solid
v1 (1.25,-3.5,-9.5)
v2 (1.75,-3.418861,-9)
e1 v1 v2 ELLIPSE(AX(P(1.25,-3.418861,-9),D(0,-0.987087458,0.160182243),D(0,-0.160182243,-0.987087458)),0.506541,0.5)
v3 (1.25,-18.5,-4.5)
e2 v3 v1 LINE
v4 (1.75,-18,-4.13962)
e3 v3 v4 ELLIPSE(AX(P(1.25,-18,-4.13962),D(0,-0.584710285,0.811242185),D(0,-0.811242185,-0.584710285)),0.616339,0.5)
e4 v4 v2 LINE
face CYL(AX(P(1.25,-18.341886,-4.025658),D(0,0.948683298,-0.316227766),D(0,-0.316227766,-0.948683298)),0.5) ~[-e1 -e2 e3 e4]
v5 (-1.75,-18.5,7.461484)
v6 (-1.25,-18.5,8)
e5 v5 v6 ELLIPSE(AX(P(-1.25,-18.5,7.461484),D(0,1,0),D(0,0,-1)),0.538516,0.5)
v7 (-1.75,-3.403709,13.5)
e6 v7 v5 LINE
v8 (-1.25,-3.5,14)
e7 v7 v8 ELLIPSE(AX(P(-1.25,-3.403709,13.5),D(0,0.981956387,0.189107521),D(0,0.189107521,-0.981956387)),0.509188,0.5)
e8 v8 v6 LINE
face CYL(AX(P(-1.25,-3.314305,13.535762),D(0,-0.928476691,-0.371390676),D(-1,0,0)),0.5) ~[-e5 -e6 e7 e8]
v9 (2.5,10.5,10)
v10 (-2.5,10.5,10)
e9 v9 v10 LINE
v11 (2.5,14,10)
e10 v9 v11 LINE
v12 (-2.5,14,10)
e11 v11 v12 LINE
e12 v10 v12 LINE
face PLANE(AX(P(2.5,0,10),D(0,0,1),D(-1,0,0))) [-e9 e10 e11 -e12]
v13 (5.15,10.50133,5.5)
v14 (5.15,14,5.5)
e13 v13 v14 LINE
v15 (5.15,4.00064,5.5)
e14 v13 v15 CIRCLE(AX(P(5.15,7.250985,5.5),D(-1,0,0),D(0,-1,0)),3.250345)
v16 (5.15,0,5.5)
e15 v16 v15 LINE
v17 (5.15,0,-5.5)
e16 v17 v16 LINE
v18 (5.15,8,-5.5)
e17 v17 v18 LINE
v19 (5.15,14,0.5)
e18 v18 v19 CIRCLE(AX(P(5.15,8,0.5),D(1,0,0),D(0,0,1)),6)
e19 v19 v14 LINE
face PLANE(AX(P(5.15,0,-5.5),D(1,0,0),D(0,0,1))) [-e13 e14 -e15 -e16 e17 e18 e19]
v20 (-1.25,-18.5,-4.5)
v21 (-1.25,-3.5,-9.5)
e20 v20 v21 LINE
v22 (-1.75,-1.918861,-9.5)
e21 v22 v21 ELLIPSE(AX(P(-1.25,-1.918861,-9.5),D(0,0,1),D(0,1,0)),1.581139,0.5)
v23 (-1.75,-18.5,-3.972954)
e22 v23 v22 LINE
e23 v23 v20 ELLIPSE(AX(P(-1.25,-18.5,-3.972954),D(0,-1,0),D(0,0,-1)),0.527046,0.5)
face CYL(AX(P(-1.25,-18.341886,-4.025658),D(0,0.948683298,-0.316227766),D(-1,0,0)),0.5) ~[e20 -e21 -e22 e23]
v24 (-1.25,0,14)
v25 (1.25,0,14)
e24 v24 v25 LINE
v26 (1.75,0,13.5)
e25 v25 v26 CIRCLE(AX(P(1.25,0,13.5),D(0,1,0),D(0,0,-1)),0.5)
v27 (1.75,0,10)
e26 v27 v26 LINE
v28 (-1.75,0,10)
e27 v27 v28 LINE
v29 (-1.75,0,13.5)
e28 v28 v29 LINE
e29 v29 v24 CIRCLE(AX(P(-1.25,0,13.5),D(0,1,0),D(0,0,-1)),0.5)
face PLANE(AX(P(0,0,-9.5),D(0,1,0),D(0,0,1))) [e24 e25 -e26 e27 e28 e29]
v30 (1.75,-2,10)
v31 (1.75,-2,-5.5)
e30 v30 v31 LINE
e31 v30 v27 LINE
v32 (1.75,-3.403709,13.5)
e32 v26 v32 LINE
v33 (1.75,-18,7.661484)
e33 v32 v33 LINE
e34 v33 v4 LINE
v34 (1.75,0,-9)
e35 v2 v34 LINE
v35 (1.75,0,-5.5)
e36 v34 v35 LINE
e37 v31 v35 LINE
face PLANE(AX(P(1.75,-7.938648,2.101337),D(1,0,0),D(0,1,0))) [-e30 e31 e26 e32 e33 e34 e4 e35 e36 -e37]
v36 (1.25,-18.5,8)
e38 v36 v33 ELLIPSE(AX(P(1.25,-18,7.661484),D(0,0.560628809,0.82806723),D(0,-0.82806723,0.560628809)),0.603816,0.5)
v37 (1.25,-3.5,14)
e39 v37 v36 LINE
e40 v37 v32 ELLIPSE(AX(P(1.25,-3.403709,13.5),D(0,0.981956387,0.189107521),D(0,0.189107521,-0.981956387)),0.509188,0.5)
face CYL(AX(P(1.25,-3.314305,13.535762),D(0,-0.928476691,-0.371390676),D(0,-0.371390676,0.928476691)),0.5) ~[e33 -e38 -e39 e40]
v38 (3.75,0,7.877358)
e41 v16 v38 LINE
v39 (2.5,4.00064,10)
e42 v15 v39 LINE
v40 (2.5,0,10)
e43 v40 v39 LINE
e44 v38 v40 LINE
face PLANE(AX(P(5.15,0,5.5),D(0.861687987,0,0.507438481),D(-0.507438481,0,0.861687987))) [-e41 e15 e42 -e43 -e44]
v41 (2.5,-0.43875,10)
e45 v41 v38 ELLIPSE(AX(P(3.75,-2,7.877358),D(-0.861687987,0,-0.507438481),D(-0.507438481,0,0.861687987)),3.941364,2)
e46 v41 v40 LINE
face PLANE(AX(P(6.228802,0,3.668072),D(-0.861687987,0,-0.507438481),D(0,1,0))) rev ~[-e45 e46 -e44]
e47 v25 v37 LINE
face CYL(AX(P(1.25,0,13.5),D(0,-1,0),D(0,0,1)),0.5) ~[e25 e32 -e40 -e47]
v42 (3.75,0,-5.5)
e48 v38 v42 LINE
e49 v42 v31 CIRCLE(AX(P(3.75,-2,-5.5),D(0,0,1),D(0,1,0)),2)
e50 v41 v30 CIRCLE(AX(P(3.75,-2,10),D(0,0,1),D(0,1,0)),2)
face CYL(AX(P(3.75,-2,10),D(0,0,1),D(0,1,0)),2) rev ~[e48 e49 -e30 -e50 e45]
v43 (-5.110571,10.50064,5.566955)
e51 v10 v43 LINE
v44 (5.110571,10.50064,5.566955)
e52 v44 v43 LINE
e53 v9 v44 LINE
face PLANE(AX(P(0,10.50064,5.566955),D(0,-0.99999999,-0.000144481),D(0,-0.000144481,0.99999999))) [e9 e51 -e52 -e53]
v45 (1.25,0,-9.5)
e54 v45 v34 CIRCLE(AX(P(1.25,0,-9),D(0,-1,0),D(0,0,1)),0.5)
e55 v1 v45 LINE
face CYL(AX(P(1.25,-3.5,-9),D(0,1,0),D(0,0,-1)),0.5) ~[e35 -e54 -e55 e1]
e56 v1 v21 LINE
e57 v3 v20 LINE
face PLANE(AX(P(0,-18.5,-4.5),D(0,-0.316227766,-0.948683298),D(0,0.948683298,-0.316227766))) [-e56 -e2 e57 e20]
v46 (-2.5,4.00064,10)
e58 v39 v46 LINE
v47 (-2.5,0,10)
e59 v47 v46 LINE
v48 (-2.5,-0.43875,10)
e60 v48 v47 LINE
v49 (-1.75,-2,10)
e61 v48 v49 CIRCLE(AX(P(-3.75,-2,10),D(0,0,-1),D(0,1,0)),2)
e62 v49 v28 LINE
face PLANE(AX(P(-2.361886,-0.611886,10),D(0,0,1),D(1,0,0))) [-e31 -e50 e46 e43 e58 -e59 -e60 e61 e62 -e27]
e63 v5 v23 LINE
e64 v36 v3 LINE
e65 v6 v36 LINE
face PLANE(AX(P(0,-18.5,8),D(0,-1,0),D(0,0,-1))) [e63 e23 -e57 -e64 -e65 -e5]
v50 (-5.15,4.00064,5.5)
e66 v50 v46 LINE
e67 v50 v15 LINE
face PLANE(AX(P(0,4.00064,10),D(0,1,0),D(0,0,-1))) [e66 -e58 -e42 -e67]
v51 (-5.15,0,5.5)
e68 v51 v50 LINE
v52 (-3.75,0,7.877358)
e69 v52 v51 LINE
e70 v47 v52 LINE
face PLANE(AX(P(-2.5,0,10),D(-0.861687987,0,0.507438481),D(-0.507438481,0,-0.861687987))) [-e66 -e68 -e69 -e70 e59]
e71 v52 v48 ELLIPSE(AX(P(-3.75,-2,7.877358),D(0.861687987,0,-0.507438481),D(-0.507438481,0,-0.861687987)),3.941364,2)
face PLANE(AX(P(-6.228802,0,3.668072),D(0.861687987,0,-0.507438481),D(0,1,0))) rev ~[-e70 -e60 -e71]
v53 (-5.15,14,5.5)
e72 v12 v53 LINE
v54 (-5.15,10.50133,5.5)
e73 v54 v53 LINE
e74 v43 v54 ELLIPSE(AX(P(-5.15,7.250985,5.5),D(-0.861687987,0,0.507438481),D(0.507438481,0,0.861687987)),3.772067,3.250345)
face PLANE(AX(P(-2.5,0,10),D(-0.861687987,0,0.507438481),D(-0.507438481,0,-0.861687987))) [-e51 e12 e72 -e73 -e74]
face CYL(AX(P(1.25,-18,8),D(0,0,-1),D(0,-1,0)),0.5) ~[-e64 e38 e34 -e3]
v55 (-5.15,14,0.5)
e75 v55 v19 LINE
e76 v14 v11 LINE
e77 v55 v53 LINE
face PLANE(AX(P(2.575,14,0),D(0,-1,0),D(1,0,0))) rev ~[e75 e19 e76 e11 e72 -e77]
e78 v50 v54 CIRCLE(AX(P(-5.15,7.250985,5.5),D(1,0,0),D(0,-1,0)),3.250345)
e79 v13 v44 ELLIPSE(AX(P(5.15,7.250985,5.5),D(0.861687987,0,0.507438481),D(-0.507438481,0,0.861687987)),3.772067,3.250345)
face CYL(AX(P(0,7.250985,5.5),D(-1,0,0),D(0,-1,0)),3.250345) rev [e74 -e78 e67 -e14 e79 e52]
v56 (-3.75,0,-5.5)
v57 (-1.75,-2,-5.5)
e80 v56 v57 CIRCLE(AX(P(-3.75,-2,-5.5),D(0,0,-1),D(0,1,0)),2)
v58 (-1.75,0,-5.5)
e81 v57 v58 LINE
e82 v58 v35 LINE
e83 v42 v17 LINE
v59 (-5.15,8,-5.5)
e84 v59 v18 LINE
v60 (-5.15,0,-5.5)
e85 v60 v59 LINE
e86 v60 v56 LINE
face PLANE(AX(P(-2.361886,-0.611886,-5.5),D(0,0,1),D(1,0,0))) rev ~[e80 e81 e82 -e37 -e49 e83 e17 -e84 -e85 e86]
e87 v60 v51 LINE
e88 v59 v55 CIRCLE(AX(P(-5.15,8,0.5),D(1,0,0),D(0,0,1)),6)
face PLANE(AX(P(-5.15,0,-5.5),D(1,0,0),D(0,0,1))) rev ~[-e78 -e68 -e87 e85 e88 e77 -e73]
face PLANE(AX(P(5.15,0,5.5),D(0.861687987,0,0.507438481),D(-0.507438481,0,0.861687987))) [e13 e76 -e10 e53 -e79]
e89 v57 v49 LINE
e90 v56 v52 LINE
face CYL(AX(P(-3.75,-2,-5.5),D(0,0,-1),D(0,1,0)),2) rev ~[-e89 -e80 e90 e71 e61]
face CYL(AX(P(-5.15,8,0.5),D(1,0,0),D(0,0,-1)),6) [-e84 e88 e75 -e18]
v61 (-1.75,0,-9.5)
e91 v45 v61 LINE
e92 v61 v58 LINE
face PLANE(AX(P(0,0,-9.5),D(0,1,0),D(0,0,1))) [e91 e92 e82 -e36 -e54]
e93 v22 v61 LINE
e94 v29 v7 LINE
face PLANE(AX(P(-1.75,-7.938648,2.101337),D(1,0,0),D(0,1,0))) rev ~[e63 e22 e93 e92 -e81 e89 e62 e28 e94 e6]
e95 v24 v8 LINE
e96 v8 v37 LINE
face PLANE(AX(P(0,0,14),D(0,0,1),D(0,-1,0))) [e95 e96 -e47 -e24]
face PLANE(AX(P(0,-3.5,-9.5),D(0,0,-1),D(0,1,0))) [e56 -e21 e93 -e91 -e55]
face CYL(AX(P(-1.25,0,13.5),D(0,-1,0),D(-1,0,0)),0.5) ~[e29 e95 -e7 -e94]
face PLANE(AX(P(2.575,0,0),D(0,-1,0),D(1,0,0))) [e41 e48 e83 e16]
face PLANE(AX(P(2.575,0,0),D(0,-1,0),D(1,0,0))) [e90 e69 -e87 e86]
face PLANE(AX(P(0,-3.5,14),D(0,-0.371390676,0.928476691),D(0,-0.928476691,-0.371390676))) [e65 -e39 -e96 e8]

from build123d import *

# Parameters (mm, degrees)
F0_W          = 5.15
F0_H          = 11
F1_DEPTH      = 14
F3_DEPTH      = 5.151
F3_DEPTH_BACK = 5.151
F5_DEPTH      = 1.75
F6_R          = 6
F7_T4_DEPTH   = 15.5
F7_T9_DEPTH   = 15.5
F8_R          = 0.5


# Not quite as in the source:
# - a fillet or chamfer that OpenCascade refuses, or shapes differently, is made with other operations: its cross-section is extruded or revolved along the edge and cut away or added


with BuildPart() as f1:
    # F0 (on Front) → F1 (new body)
    with BuildSketch(Plane.XZ):
        with Locations((2.575, 0)):
            Rectangle(F0_W, F0_H)
        Polygon((0, 5.5), (5.15, 5.5), (2.5, 10), (0, 10), align=None)
        with Locations((-2.575, 0)):
            Rectangle(F0_W, F0_H)
        Polygon((-5.15, 5.5), (0, 5.5), (0, 10), (-2.5, 10), align=None)
    extrude(amount=-F1_DEPTH)

    # F2 (on Right) → F3 (cut, two sides)
    with BuildSketch(Plane.YZ) as f3_sk:
        with BuildLine():
            Line((4.0006404915, 10), (4.0006404915, 5.5))
            ThreePointArc((4.0006404915, 5.5), (7.2844648336, 2.2498275803), (10.5006404915, 5.5669554351))
            Line((10.5006404915, 5.5669554351), (10.5, 10))
            Line((10.5, 10), (4.0006404915, 10))
        make_face()
    extrude(amount=F3_DEPTH, mode=Mode.SUBTRACT)
    extrude(f3_sk.sketch, amount=-F3_DEPTH_BACK, mode=Mode.SUBTRACT)

    # F4 (on Right) → F5 (join, symmetric)
    with BuildSketch(Plane.YZ):
        Polygon((0, -9.5), (0, 0), (0, 14), (-3.5, 14), (-18.5, 8), (-18.5, -4.5), (-3.5, -9.5), align=None)
    extrude(amount=F5_DEPTH, both=True)

    # F6
    f6_edges = [f1.edges().sort_by_distance(p)[0] for p in [
        (0, 14, -5.5),
    ]]
    fillet(f6_edges, radius=F6_R)

    # F7: fillet of radius 2 on 2 edges, made by hand


with BuildPart() as f7_tool2:
    # F7_s3 → F7_t4 (new body)
    with BuildSketch(Plane.XY.offset(10)):
        with BuildLine():
            ThreePointArc((3.75, 0), (2.3357864376, -0.5857864376), (1.75, -2))
            Line((1.75, -2), (1.75, 0))
            Line((1.75, 0), (3.75, 0))
        make_face()
    extrude(amount=-F7_T4_DEPTH)

    split(bisect_by=Plane(origin=(6.2288019067, 0, 3.6680722339), x_dir=(0, 1, 0), z_dir=(-0.8616879874, 0, -0.5074384814)), keep=Keep.TOP)


with BuildPart() as f1_1:
    add(f1.part)

    # F7_t1: union F7_tool2
    add(f7_tool2.part)


with BuildPart() as f7_tool7:
    # F7_s8 → F7_t9 (new body)
    with BuildSketch(Plane.XY.offset(-5.5)):
        with BuildLine():
            ThreePointArc((-3.75, 0), (-2.3357864376, -0.5857864376), (-1.75, -2))
            Line((-1.75, -2), (-1.75, 0))
            Line((-1.75, 0), (-3.75, 0))
        make_face()
    extrude(amount=F7_T9_DEPTH)

    split(bisect_by=Plane(origin=(-6.2288019067, 0, 3.6680722339), x_dir=(0, 1, 0), z_dir=(0.8616879874, 0, -0.5074384814)), keep=Keep.TOP)


with BuildPart() as f1_2:
    add(f1_1.part)

    # F7_t6: union F7_tool7
    add(f7_tool7.part)

    # F8
    f8_edges = [f1_2.edges().sort_by_distance(p)[0] for p in [
        (1.75, -11, 11),
        (1.75, -1.75, 14),
        (1.75, -18.5, 1.75),
        (1.75, -11, -7),
        (1.75, -1.75, -9.5),
        (-1.75, -11, 11),
        (-1.75, -1.75, 14),
        (-1.75, -11, -7),
    ]]
    fillet(f8_edges, radius=F8_R)


solid = f1_2.part
